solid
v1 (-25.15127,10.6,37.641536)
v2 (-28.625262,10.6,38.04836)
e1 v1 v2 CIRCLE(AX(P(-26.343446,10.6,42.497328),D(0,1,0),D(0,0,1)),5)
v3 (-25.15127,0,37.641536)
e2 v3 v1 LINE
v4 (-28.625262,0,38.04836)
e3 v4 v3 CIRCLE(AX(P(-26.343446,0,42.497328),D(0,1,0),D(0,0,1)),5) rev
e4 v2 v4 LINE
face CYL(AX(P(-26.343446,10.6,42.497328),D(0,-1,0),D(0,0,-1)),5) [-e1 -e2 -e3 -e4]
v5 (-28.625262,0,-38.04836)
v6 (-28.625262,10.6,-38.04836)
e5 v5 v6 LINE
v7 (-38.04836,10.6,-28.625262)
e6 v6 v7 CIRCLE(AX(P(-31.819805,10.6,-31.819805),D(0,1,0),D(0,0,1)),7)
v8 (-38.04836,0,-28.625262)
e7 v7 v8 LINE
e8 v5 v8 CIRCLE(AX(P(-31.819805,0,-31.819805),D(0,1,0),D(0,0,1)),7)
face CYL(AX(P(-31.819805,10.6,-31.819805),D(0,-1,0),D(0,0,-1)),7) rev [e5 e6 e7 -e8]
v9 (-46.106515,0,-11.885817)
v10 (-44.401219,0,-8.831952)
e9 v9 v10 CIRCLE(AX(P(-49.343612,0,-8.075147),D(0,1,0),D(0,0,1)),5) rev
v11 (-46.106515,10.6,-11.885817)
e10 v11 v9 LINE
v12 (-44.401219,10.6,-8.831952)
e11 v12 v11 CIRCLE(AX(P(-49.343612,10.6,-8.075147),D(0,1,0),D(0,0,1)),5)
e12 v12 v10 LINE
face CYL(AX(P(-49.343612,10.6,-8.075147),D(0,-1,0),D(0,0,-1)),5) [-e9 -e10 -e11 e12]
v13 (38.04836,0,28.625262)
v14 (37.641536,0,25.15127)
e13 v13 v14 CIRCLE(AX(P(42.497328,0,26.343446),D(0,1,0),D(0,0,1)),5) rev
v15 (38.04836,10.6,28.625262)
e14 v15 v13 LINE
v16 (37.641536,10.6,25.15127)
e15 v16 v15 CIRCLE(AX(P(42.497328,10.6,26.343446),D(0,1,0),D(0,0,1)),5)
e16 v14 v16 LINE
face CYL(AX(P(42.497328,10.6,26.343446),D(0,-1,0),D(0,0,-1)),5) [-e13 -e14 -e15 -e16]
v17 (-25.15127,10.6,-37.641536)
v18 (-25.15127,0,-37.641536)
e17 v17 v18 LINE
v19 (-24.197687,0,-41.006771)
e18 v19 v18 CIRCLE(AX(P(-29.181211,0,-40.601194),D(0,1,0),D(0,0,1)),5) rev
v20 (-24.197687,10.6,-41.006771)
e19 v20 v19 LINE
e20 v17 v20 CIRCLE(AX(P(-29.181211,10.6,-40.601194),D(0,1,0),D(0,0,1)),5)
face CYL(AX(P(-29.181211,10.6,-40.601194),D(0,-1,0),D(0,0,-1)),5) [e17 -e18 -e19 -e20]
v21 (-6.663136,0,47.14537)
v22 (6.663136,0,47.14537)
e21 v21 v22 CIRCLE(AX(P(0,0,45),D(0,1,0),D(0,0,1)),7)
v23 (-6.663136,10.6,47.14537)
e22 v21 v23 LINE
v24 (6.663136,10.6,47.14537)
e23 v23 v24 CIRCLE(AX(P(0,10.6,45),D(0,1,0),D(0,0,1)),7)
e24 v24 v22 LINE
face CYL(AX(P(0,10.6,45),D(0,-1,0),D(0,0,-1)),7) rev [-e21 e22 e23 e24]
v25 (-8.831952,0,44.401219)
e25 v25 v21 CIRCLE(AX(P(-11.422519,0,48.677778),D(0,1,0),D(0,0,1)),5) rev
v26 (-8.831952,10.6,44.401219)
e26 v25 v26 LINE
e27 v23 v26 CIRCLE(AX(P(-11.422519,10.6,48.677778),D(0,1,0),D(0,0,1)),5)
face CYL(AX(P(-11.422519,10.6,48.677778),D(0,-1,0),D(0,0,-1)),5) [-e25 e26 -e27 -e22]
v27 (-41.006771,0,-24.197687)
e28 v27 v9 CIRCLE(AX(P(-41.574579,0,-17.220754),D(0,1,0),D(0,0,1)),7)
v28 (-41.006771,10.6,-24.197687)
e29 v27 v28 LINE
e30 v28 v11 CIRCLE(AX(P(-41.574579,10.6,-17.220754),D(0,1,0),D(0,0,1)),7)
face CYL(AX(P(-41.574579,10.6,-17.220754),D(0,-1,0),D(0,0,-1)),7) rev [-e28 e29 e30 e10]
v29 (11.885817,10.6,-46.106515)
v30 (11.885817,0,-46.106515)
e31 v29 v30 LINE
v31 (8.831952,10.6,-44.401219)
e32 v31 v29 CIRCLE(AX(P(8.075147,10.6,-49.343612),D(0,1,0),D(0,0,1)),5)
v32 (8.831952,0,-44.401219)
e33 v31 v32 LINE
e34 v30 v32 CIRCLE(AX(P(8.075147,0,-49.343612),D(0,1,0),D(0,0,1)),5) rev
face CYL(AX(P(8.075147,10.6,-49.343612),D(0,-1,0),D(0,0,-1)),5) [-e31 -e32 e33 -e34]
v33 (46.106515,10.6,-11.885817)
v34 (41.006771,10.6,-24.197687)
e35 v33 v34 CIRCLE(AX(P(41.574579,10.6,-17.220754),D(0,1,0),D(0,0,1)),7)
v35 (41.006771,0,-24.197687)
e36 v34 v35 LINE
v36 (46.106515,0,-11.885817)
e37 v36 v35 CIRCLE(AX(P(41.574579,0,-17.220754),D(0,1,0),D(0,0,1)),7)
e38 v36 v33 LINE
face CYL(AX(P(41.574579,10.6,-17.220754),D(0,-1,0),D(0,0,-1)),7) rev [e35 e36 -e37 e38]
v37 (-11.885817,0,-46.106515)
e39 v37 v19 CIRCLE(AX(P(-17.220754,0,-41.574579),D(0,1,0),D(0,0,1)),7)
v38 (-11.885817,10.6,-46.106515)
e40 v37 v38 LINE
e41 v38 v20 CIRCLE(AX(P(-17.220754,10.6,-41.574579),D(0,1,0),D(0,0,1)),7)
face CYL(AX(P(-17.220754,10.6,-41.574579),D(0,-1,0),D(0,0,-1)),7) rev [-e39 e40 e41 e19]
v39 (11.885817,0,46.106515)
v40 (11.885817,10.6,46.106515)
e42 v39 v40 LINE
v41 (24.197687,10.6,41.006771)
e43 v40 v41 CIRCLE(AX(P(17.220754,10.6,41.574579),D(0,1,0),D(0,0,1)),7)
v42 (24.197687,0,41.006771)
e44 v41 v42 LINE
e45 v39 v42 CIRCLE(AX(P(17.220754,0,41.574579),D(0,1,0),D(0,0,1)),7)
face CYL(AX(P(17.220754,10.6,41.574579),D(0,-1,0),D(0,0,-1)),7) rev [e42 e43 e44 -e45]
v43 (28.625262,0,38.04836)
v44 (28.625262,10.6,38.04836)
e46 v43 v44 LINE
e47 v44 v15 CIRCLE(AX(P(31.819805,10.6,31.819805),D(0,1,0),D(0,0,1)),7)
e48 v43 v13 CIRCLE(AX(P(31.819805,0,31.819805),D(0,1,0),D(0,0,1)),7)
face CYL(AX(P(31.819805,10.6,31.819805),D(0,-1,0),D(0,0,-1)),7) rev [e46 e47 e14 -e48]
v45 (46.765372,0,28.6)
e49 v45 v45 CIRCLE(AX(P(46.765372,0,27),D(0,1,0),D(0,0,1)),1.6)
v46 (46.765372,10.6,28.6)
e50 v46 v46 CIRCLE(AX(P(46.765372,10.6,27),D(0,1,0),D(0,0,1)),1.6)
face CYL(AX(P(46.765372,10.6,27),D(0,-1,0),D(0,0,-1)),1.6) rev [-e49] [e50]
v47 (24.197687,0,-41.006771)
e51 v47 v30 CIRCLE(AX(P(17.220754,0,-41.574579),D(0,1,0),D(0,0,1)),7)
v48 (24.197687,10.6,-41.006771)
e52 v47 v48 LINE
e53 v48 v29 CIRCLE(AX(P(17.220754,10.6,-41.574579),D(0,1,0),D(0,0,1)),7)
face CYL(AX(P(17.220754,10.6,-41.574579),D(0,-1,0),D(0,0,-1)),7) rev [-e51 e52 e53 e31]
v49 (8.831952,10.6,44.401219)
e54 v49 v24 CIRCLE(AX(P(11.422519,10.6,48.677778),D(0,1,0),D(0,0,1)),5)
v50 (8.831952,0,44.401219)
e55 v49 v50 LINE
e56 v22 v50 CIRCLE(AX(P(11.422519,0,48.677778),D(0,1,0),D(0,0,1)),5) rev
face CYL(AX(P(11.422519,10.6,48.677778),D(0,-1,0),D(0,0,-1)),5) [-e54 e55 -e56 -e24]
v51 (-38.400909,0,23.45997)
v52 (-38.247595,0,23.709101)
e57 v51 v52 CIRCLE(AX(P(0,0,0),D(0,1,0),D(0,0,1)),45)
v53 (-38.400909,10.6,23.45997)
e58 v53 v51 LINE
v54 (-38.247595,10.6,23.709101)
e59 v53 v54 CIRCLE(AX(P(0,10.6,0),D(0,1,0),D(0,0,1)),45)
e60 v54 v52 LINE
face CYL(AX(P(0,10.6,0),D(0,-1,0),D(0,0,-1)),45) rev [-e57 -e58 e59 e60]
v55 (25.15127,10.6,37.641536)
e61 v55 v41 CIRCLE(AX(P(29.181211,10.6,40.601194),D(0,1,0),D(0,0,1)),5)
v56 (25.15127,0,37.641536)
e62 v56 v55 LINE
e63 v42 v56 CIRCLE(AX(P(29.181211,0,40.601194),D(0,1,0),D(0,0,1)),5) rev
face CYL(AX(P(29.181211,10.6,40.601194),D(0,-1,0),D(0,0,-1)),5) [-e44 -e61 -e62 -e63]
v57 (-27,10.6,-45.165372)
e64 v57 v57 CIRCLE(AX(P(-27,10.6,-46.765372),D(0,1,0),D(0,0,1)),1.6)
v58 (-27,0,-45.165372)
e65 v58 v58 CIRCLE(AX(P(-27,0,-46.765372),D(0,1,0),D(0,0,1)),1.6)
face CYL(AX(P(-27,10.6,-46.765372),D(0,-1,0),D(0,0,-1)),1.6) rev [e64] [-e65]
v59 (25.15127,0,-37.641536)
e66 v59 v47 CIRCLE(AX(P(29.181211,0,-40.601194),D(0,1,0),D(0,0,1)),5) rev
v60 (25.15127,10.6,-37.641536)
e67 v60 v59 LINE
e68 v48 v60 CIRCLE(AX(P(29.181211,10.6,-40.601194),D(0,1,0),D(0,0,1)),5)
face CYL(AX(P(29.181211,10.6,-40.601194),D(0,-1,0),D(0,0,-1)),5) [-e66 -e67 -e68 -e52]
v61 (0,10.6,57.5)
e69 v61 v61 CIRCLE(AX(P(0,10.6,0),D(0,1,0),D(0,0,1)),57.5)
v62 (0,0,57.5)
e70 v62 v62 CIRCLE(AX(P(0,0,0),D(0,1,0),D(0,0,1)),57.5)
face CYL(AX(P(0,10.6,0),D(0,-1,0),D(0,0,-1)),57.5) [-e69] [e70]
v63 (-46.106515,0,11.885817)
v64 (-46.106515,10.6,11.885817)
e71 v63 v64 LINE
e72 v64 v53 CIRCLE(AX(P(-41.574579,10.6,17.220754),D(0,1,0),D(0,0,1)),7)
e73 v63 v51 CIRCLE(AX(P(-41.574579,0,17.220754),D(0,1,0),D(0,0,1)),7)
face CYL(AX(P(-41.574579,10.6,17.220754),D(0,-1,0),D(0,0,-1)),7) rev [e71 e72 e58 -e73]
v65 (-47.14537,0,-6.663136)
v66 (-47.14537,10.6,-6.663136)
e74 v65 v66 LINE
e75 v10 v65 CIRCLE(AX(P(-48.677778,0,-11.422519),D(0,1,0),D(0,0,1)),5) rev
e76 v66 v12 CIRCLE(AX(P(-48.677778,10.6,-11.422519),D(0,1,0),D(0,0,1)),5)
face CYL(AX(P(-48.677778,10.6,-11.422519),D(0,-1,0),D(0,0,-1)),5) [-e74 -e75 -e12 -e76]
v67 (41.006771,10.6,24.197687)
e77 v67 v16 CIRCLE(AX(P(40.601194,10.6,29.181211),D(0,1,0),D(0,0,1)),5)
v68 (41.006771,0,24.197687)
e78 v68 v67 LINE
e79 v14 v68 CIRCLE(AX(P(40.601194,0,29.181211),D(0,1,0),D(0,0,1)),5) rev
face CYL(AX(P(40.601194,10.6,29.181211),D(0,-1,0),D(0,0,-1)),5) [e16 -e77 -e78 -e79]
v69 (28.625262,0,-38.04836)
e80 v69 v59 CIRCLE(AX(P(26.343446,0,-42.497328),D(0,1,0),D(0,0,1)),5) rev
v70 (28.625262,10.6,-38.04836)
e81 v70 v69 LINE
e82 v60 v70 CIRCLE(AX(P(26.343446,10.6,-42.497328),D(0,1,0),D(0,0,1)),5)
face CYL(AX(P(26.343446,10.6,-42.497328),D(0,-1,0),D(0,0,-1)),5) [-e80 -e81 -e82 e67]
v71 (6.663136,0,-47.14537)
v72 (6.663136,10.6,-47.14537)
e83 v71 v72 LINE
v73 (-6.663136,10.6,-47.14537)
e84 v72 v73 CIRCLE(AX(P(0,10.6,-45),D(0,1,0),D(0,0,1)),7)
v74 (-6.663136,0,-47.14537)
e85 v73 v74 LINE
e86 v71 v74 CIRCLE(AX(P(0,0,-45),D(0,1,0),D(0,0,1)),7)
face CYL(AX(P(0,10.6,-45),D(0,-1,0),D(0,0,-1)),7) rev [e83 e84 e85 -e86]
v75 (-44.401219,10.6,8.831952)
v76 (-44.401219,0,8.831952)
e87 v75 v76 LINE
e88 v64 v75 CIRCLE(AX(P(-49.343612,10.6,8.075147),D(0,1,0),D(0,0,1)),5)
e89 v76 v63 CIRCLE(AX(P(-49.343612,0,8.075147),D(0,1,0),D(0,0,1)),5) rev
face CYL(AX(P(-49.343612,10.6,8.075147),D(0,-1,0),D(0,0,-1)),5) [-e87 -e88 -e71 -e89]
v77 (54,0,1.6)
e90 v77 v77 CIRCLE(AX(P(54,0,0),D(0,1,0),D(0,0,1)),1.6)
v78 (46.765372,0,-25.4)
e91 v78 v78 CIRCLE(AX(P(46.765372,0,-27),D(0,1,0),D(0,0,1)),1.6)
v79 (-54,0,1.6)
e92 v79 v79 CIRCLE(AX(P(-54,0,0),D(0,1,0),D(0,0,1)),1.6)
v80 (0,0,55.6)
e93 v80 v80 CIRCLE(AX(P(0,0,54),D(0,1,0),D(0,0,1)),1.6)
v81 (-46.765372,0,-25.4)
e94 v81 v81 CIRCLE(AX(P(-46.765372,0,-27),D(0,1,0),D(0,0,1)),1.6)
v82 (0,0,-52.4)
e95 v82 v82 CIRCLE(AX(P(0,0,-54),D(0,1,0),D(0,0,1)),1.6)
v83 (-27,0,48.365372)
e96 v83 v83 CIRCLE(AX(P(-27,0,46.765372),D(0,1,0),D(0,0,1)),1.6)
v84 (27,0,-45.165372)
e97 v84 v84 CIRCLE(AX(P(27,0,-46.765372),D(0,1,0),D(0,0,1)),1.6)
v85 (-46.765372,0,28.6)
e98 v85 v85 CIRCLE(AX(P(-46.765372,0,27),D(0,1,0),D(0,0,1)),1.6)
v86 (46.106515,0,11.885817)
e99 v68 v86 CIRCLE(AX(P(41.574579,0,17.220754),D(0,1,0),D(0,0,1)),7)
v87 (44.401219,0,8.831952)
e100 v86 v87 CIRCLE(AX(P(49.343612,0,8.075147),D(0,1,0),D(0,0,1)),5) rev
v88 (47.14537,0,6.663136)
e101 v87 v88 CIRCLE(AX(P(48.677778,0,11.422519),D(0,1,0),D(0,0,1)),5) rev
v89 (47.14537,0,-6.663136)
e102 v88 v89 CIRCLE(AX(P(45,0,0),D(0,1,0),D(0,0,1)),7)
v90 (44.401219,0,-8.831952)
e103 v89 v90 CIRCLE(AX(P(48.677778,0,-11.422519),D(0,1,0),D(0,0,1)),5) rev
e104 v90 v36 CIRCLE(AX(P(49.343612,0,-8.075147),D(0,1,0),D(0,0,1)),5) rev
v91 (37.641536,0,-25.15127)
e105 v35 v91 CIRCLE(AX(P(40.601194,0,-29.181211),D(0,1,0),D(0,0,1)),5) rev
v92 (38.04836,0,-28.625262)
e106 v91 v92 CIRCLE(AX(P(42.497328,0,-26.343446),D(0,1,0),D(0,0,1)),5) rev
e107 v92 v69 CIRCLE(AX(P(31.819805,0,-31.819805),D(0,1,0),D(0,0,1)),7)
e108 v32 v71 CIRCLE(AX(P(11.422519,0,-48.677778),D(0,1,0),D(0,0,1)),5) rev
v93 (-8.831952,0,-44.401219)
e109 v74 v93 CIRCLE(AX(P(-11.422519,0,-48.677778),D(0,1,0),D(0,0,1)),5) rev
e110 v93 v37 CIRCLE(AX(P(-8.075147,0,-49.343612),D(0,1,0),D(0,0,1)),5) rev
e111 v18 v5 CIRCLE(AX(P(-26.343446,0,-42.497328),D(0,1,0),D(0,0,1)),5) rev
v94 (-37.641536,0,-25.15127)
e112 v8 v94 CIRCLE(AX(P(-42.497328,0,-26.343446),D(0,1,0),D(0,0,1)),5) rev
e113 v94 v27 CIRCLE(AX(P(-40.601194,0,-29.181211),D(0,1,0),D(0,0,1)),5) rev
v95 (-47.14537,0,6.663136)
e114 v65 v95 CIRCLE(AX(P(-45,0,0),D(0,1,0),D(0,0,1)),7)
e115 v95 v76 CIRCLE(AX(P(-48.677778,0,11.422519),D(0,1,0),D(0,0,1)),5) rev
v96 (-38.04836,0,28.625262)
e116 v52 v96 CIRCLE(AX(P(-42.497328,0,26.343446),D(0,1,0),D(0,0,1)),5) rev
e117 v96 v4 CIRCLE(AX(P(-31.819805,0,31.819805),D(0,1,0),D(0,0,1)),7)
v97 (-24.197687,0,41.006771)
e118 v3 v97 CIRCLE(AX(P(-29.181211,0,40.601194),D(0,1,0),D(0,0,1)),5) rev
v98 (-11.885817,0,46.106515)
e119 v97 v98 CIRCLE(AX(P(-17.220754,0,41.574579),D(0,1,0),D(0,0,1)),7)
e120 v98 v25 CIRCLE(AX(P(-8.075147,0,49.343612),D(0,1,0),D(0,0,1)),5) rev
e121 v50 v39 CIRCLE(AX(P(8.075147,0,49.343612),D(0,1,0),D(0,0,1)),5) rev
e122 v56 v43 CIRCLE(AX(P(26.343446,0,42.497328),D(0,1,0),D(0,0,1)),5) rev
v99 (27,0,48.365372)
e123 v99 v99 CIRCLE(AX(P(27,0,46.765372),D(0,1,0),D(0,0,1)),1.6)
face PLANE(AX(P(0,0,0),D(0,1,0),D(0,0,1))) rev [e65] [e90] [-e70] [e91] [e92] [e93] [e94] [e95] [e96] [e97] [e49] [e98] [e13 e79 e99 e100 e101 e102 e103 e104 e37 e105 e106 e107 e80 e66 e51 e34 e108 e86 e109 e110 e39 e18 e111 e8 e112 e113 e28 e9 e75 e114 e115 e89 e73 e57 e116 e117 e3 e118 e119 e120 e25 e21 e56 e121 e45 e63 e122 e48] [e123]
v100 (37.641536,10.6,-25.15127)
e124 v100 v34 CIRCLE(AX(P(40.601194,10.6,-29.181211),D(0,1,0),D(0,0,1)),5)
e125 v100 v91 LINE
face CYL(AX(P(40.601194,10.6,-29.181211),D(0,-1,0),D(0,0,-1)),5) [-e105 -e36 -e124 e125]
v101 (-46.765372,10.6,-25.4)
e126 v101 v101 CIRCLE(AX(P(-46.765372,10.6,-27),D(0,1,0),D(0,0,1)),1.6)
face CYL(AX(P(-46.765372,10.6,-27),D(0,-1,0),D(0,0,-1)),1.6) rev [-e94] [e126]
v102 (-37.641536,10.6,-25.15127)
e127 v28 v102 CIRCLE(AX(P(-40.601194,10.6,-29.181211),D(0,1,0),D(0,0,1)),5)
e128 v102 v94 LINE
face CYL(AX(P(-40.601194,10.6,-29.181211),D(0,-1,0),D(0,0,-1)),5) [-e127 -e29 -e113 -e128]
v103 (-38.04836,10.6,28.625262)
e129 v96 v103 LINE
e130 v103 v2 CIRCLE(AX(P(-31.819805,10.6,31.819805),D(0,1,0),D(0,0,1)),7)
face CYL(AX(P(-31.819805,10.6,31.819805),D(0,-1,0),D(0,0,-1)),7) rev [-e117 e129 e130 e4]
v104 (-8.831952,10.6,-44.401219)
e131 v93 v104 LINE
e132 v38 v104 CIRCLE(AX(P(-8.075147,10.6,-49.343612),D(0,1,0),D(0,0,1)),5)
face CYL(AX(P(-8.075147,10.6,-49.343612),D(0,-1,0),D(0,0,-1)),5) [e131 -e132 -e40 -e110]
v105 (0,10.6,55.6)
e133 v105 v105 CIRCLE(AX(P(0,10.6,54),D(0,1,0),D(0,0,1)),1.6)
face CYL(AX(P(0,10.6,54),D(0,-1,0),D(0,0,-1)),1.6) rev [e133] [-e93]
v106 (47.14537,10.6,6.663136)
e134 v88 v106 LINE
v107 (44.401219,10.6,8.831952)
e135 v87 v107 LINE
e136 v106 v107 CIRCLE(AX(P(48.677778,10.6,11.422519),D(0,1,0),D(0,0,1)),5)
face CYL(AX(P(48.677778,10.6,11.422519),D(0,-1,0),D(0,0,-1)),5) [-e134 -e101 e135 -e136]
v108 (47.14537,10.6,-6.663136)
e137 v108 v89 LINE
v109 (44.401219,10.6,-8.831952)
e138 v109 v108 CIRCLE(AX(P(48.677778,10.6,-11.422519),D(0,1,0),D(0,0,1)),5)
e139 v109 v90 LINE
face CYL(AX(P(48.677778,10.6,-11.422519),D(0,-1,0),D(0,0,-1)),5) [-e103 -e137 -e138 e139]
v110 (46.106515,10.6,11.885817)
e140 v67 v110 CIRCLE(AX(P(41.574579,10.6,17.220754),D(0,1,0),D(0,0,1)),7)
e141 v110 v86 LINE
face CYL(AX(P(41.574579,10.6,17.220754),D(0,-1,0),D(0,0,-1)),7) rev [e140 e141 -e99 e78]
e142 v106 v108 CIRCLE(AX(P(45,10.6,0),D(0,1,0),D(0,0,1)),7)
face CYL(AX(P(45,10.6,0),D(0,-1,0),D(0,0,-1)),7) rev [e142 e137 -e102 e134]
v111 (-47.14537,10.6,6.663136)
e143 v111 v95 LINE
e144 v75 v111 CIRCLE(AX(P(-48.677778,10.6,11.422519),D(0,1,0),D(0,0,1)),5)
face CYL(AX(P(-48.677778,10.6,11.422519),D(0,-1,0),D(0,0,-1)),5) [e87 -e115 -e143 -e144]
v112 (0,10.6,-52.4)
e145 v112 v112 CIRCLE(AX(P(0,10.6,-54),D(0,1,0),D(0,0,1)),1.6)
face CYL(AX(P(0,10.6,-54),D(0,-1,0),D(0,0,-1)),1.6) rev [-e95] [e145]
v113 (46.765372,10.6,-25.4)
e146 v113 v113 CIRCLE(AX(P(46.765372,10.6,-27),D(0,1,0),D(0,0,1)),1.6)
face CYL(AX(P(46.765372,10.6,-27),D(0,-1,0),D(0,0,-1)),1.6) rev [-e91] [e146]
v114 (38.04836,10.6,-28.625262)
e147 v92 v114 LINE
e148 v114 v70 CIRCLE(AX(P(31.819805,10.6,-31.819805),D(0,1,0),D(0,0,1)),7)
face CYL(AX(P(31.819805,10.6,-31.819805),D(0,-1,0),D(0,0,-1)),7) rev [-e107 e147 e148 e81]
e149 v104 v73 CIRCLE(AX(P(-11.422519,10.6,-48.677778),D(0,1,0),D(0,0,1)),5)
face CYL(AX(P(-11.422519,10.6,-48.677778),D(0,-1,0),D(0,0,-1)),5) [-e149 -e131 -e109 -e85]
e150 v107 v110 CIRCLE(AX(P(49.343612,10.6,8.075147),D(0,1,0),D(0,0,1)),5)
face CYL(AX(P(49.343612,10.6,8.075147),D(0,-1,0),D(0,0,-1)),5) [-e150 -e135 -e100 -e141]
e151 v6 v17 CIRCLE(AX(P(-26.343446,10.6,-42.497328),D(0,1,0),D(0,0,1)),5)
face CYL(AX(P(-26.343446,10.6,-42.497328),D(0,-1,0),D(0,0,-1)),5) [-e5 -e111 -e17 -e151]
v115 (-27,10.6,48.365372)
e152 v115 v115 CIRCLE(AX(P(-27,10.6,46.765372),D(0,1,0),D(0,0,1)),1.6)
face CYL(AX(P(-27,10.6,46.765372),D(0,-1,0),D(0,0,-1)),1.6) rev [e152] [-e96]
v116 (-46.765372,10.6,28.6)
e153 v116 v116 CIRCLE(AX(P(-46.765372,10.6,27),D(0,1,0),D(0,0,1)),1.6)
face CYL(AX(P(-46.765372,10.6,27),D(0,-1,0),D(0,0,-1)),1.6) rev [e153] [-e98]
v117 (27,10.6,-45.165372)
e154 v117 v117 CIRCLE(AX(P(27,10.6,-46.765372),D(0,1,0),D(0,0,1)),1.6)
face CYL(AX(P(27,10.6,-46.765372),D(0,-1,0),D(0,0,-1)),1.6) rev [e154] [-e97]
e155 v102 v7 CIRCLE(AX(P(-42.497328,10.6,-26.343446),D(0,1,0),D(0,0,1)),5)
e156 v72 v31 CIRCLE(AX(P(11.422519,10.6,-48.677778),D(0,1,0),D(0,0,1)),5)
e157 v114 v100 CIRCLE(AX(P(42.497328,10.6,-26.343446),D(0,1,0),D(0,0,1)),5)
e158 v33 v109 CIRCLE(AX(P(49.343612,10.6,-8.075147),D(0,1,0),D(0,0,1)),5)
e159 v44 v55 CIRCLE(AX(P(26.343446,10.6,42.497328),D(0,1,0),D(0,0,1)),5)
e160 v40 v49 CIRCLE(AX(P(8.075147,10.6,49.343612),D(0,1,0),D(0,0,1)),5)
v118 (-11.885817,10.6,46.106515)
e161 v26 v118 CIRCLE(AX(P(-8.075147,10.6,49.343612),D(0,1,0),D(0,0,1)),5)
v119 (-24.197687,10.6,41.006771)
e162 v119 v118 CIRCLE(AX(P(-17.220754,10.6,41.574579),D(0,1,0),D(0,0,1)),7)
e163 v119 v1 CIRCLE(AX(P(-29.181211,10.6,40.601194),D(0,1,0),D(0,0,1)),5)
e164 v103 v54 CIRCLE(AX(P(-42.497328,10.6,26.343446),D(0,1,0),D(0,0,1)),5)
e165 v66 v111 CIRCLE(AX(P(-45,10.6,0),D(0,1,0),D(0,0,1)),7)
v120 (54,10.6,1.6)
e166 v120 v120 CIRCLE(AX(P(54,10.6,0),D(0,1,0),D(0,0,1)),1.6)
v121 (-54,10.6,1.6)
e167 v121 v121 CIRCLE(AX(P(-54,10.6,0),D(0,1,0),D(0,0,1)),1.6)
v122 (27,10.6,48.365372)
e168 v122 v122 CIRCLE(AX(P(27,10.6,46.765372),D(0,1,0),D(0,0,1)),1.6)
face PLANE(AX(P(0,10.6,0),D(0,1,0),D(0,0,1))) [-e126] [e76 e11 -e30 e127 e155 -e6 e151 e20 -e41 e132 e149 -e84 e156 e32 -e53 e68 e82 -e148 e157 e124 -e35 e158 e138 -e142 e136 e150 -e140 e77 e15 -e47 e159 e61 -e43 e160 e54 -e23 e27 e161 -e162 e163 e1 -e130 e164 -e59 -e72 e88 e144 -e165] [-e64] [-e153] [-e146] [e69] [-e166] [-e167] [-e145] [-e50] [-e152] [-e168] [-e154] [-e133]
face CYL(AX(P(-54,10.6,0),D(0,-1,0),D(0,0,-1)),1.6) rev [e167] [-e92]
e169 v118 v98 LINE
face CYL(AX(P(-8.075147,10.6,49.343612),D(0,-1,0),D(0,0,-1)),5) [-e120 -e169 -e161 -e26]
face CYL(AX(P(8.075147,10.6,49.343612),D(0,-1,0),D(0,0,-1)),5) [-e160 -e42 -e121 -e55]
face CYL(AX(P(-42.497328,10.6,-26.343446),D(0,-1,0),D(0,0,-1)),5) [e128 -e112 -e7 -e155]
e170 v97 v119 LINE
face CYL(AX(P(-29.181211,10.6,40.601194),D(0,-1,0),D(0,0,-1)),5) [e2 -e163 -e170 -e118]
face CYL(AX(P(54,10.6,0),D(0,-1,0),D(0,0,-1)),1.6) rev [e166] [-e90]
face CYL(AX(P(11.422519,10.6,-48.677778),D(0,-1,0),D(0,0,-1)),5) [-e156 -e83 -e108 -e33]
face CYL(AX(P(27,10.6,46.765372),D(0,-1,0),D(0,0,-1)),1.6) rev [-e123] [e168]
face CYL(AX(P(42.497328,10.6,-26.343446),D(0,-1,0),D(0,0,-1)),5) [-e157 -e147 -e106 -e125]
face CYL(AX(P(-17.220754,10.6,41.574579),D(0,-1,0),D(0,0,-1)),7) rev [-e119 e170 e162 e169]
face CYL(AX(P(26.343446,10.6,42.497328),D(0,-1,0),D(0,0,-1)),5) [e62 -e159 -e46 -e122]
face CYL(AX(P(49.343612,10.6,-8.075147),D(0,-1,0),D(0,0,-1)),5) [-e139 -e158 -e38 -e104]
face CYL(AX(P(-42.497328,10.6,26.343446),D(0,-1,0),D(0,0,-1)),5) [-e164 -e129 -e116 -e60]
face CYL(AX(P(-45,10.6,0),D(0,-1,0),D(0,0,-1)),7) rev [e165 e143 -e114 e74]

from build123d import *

# Parameters (mm, degrees)
SKETCH1_R           = 57.5
SKETCH1_R_2         = 1.6
BOSS_EXTRUDE1_DEPTH = 10.6
FILLET1_R           = 5


with BuildPart() as part:
    # Sketch1 → Boss-Extrude1 (new body)
    with BuildSketch(Plane(origin=(0, 0, 0), x_dir=(1, 0, 0), z_dir=(0, 1, 0))):
        with Locations(Location((0, 0, 0), (0, 0, 270))):
            Circle(SKETCH1_R)
        with Locations(Location((-27, -46.765371804, 0), (0, 0, 270))):
            Circle(SKETCH1_R_2, mode=Mode.SUBTRACT)
        with Locations(Location((-46.765371804, -27, 0), (0, 0, 270))):
            Circle(SKETCH1_R_2, mode=Mode.SUBTRACT)
        with Locations(Location((-54, 0, 0), (0, 0, 270))):
            Circle(SKETCH1_R_2, mode=Mode.SUBTRACT)
        with Locations(Location((0, -54, 0), (0, 0, 270))):
            Circle(SKETCH1_R_2, mode=Mode.SUBTRACT)
        with Locations(Location((27, -46.765371804, 0), (0, 0, 270))):
            Circle(SKETCH1_R_2, mode=Mode.SUBTRACT)
        with BuildLine():
            ThreePointArc((43.742247125, 10.564838686), (44.135337618, 8.779064491), (44.455555556, 6.978795043))
            ThreePointArc((44.455555556, 6.978795043), (49.753361384, 5.138633627), (52, 0))
            ThreePointArc((52, 0), (49.753361384, -5.138633627), (44.455555556, -6.978795043))
            ThreePointArc((44.455555556, -6.978795043), (44.135337618, -8.779064491), (43.742247125, -10.564838686))
            ThreePointArc((43.742247125, -10.564838686), (47.23910353, -13.108193036), (48.574578963, -17.220754456))
            ThreePointArc((48.574578963, -17.220754456), (45.234108152, -23.187985482), (38.400908644, -23.459970489))
            ThreePointArc((38.400908644, -23.459970489), (37.416132554, -25.000660486), (36.369578094, -26.500071496))
            ThreePointArc((36.369578094, -26.500071496), (38.177808401, -28.89135937), (38.819805153, -31.819805153))
            ThreePointArc((38.819805153, -31.819805153), (34.244868492, -38.386316236), (26.500071496, -36.369578094))
            ThreePointArc((26.500071496, -36.369578094), (25.000660486, -37.416132554), (23.459970489, -38.400908644))
            ThreePointArc((23.459970489, -38.400908644), (24.027901885, -39.942787345), (24.220754456, -41.574578963))
            ThreePointArc((24.220754456, -41.574578963), (18.318158122, -48.488022764), (10.564838686, -43.742247125))
            ThreePointArc((10.564838686, -43.742247125), (8.779064491, -44.135337618), (6.978795043, -44.455555556))
            ThreePointArc((6.978795043, -44.455555556), (6.994696752, -44.727571384), (7, -45))
            ThreePointArc((7, -45), (-0.272428616, -51.994696752), (-6.978795043, -44.455555556))
            ThreePointArc((-6.978795043, -44.455555556), (-8.779064491, -44.135337618), (-10.564838686, -43.742247125))
            ThreePointArc((-10.564838686, -43.742247125), (-19.899538483, -48.041735691), (-23.459970489, -38.400908644))
            ThreePointArc((-23.459970489, -38.400908644), (-25.000660486, -37.416132554), (-26.500071496, -36.369578094))
            ThreePointArc((-26.500071496, -36.369578094), (-36.769552622, -36.769552622), (-36.369578094, -26.500071496))
            ThreePointArc((-36.369578094, -26.500071496), (-37.416132554, -25.000660486), (-38.400908644, -23.459970489))
            ThreePointArc((-38.400908644, -23.459970489), (-48.041735691, -19.899538483), (-43.742247125, -10.564838686))
            ThreePointArc((-43.742247125, -10.564838686), (-44.135337618, -8.779064491), (-44.455555556, -6.978795043))
            ThreePointArc((-44.455555556, -6.978795043), (-52, 0), (-44.455555556, 6.978795043))
            ThreePointArc((-44.455555556, 6.978795043), (-44.135337618, 8.779064491), (-43.742247125, 10.564838686))
            ThreePointArc((-43.742247125, 10.564838686), (-48.041735691, 19.899538483), (-38.400908644, 23.459970489))
            ThreePointArc((-38.400908644, 23.459970489), (-37.416132554, 25.000660486), (-36.369578094, 26.500071496))
            ThreePointArc((-36.369578094, 26.500071496), (-36.769552622, 36.769552622), (-26.500071496, 36.369578094))
            ThreePointArc((-26.500071496, 36.369578094), (-25.000660486, 37.416132554), (-23.459970489, 38.400908644))
            ThreePointArc((-23.459970489, 38.400908644), (-19.899538483, 48.041735691), (-10.564838686, 43.742247125))
            ThreePointArc((-10.564838686, 43.742247125), (-8.779064491, 44.135337618), (-6.978795043, 44.455555556))
            ThreePointArc((-6.978795043, 44.455555556), (-0.272428616, 51.994696752), (7, 45))
            ThreePointArc((7, 45), (6.994696752, 44.727571384), (6.978795043, 44.455555556))
            ThreePointArc((6.978795043, 44.455555556), (8.779064491, 44.135337618), (10.564838686, 43.742247125))
            ThreePointArc((10.564838686, 43.742247125), (18.318158122, 48.488022764), (24.220754456, 41.574578963))
            ThreePointArc((24.220754456, 41.574578963), (24.027901885, 39.942787345), (23.459970489, 38.400908644))
            ThreePointArc((23.459970489, 38.400908644), (25.000660486, 37.416132554), (26.500071496, 36.369578094))
            ThreePointArc((26.500071496, 36.369578094), (34.244868492, 38.386316236), (38.819805153, 31.819805153))
            ThreePointArc((38.819805153, 31.819805153), (38.177808401, 28.89135937), (36.369578094, 26.500071496))
            ThreePointArc((36.369578094, 26.500071496), (37.416132554, 25.000660486), (38.400908644, 23.459970489))
            ThreePointArc((38.400908644, 23.459970489), (45.234108152, 23.187985482), (48.574578963, 17.220754456))
            ThreePointArc((48.574578963, 17.220754456), (47.23910353, 13.108193036), (43.742247125, 10.564838686))
        make_face(mode=Mode.SUBTRACT)
        with Locations(Location((46.765371804, -27, 0), (0, 0, 270))):
            Circle(SKETCH1_R_2, mode=Mode.SUBTRACT)
        with Locations(Location((-46.765371804, 27, 0), (0, 0, 270))):
            Circle(SKETCH1_R_2, mode=Mode.SUBTRACT)
        with Locations(Location((-27, 46.765371804, 0), (0, 0, 270))):
            Circle(SKETCH1_R_2, mode=Mode.SUBTRACT)
        with Locations(Location((54, 0, 0), (0, 0, 270))):
            Circle(SKETCH1_R_2, mode=Mode.SUBTRACT)
        with Locations(Location((46.765371804, 27, 0), (0, 0, 270))):
            Circle(SKETCH1_R_2, mode=Mode.SUBTRACT)
        with Locations(Location((0, 54, 0), (0, 0, 270))):
            Circle(SKETCH1_R_2, mode=Mode.SUBTRACT)
        with Locations(Location((27, 46.765371804, 0), (0, 0, 270))):
            Circle(SKETCH1_R_2, mode=Mode.SUBTRACT)
    extrude(amount=BOSS_EXTRUDE1_DEPTH)

    # Fillet1
    # the kernel refuses this fillet: 5 mm, written as the material it takes off along each edge
    with BuildSketch(Plane(origin=(-23.459970489, -8.409987516, -38.400908644), x_dir=(-0.2723938397119589, 0, -0.9621858428011585), z_dir=(0, 1, 0)), Plane(origin=(-36.369578094, -8.409987516, -26.500071496), x_dir=(-0.6198716741882146, 0, -0.7847031971000881), z_dir=(0, 1, 0)), Plane(origin=(-43.742247125, -8.409987516, -10.564838686), x_dir=(-0.8729796654201095, 0, -0.48775660299271545), z_dir=(0, 1, 0)), Plane(origin=(-44.455555556, -8.409987516, 6.978795043), x_dir=(-0.9931844161721819, 0, -0.11655348760428477), z_dir=(0, 1, 0)), Plane(origin=(-26.500071496, -8.409987516, 36.369578094), x_dir=(-0.7847031971000193, 0, 0.6198716741883018), z_dir=(0, 1, 0)), Plane(origin=(-10.564838686, -8.409987516, 43.742247125), x_dir=(-0.4877566029925422, 0, 0.8729796654202064), z_dir=(0, 1, 0)), Plane(origin=(6.978795043, -8.409987516, 44.455555556), x_dir=(-0.11655348760405627, 0, 0.9931844161722087), z_dir=(0, 1, 0)), Plane(origin=(23.459970489, -8.409987516, 38.400908644), x_dir=(0.2723938397121838, 0, 0.9621858428010948), z_dir=(0, 1, 0)), Plane(origin=(36.369578094, -8.409987516, 26.500071496), x_dir=(0.6198716741885055, 0, 0.7847031970998585), z_dir=(0, 1, 0)), Plane(origin=(43.742247125, -8.409987516, 10.564838686), x_dir=(0.8729796654202305, 0, 0.48775660299249896), z_dir=(0, 1, 0)), Plane(origin=(44.455555556, -8.409987516, -6.978795043), x_dir=(0.993184416172219, 0, 0.11655348760396912), z_dir=(0, 1, 0)), Plane(origin=(38.400908644, -8.409987516, -23.459970489), x_dir=(0.9621858428010855, 0, -0.2723938397122163), z_dir=(0, 1, 0)), Plane(origin=(26.500071496, -8.409987516, -36.369578094), x_dir=(0.7847031970998928, 0, -0.6198716741884621), z_dir=(0, 1, 0)), Plane(origin=(10.564838686, -8.409987516, -43.742247125), x_dir=(0.4877566029926196, 0, -0.8729796654201631), z_dir=(0, 1, 0)), Plane(origin=(-6.978795043, -8.409987516, -44.455555556), x_dir=(0.11655348760419053, 0, -0.9931844161721929), z_dir=(0, 1, 0))) as fillet1_piece_1:
        with BuildLine():
            CenterArc((3.675513735, 4.905552558), FILLET1_R, 199.899092777, 58.946827573)
            ThreePointArc((-1.025953847, 3.20372925), (-0.483029435, 1.61145493), (0, 0))
            ThreePointArc((0, 0), (1.354136639, 0.132226419), (2.708273278, 0))
        make_face()
    extrude(amount=27.419975032, mode=Mode.SUBTRACT)
    with BuildSketch(Plane(origin=(-26.500071496, -8.409987516, -36.369578094), x_dir=(0.8296594592290296, 0, -0.5582698108547461), z_dir=(0, 1, 0)), Plane(origin=(-38.400908644, -8.409987516, -23.459970489), x_dir=(0.5528647859323804, 0, -0.8332709814195759), z_dir=(0, 1, 0)), Plane(origin=(-44.455555556, -8.409987516, -6.978795043), x_dir=(0.1919014607092957, 0, -0.9814141986835317), z_dir=(0, 1, 0)), Plane(origin=(-43.742247125, -8.409987516, 10.564838686), x_dir=(-0.19827712231571695, 0, -0.9801460007397867), z_dir=(0, 1, 0)), Plane(origin=(-36.369578094, -8.409987516, 26.500071496), x_dir=(-0.558269810854761, 0, -0.8296594592290196), z_dir=(0, 1, 0)), Plane(origin=(-23.459970489, -8.409987516, 38.400908644), x_dir=(-0.8332709814195962, 0, -0.5528647859323499), z_dir=(0, 1, 0)), Plane(origin=(-6.978795043, -8.409987516, 44.455555556), x_dir=(-0.9814141986835541, 0, -0.19190146070918135), z_dir=(0, 1, 0)), Plane(origin=(10.564838686, -8.409987516, 43.742247125), x_dir=(-0.9801460007397754, 0, 0.1982771223157732), z_dir=(0, 1, 0)), Plane(origin=(26.500071496, -8.409987516, 36.369578094), x_dir=(-0.8296594592289986, 0, 0.5582698108547921), z_dir=(0, 1, 0)), Plane(origin=(38.400908644, -8.409987516, 23.459970489), x_dir=(-0.552864785932314, 0, 0.83327098141962), z_dir=(0, 1, 0)), Plane(origin=(44.455555556, -8.409987516, 6.978795043), x_dir=(-0.19190146070922567, 0, 0.9814141986835454), z_dir=(0, 1, 0)), Plane(origin=(43.742247125, -8.409987516, -10.564838686), x_dir=(0.19827712231576203, 0, 0.9801460007397778), z_dir=(0, 1, 0)), Plane(origin=(23.459970489, -8.409987516, -38.400908644), x_dir=(0.8332709814195809, 0, 0.552864785932373), z_dir=(0, 1, 0)), Plane(origin=(6.978795043, -8.409987516, -44.455555556), x_dir=(0.9814141986835359, 0, 0.19190146070927452), z_dir=(0, 1, 0)), Plane(origin=(-10.564838686, -8.409987516, -43.742247125), x_dir=(0.9801460007397866, 0, -0.1982771223157175), z_dir=(0, 1, 0))) as fillet1_piece_2:
        with BuildLine():
            CenterArc((3.550883618, 4.996506044), FILLET1_R, 208.911087711, 58.946827573)
            ThreePointArc((-0.825971318, 2.579247086), (-0.287058705, 1.329950061), (0, 0))
            ThreePointArc((0, 0), (1.681997503, 0.031445605), (3.363995006, 0))
        make_face()
    extrude(amount=27.419975032, mode=Mode.SUBTRACT)
    with BuildSketch(Plane(origin=(36.369578094, -8.409987516, -26.500071496), x_dir=(0.6198716741884495, 0, -0.7847031970999027), z_dir=(0, 1, 0))) as fillet1_piece_3:
        with BuildLine():
            CenterArc((3.675513735, -4.905552558), FILLET1_R, 101.154079649, 58.946827573)
            ThreePointArc((-1.025953847, -3.20372925), (-0.483029435, -1.61145493), (0, 0))
            ThreePointArc((0, 0), (1.354136639, -0.132226419), (2.708273278, 0))
        make_face()
    extrude(amount=27.419975032, mode=Mode.SUBTRACT)


solid = part.part
